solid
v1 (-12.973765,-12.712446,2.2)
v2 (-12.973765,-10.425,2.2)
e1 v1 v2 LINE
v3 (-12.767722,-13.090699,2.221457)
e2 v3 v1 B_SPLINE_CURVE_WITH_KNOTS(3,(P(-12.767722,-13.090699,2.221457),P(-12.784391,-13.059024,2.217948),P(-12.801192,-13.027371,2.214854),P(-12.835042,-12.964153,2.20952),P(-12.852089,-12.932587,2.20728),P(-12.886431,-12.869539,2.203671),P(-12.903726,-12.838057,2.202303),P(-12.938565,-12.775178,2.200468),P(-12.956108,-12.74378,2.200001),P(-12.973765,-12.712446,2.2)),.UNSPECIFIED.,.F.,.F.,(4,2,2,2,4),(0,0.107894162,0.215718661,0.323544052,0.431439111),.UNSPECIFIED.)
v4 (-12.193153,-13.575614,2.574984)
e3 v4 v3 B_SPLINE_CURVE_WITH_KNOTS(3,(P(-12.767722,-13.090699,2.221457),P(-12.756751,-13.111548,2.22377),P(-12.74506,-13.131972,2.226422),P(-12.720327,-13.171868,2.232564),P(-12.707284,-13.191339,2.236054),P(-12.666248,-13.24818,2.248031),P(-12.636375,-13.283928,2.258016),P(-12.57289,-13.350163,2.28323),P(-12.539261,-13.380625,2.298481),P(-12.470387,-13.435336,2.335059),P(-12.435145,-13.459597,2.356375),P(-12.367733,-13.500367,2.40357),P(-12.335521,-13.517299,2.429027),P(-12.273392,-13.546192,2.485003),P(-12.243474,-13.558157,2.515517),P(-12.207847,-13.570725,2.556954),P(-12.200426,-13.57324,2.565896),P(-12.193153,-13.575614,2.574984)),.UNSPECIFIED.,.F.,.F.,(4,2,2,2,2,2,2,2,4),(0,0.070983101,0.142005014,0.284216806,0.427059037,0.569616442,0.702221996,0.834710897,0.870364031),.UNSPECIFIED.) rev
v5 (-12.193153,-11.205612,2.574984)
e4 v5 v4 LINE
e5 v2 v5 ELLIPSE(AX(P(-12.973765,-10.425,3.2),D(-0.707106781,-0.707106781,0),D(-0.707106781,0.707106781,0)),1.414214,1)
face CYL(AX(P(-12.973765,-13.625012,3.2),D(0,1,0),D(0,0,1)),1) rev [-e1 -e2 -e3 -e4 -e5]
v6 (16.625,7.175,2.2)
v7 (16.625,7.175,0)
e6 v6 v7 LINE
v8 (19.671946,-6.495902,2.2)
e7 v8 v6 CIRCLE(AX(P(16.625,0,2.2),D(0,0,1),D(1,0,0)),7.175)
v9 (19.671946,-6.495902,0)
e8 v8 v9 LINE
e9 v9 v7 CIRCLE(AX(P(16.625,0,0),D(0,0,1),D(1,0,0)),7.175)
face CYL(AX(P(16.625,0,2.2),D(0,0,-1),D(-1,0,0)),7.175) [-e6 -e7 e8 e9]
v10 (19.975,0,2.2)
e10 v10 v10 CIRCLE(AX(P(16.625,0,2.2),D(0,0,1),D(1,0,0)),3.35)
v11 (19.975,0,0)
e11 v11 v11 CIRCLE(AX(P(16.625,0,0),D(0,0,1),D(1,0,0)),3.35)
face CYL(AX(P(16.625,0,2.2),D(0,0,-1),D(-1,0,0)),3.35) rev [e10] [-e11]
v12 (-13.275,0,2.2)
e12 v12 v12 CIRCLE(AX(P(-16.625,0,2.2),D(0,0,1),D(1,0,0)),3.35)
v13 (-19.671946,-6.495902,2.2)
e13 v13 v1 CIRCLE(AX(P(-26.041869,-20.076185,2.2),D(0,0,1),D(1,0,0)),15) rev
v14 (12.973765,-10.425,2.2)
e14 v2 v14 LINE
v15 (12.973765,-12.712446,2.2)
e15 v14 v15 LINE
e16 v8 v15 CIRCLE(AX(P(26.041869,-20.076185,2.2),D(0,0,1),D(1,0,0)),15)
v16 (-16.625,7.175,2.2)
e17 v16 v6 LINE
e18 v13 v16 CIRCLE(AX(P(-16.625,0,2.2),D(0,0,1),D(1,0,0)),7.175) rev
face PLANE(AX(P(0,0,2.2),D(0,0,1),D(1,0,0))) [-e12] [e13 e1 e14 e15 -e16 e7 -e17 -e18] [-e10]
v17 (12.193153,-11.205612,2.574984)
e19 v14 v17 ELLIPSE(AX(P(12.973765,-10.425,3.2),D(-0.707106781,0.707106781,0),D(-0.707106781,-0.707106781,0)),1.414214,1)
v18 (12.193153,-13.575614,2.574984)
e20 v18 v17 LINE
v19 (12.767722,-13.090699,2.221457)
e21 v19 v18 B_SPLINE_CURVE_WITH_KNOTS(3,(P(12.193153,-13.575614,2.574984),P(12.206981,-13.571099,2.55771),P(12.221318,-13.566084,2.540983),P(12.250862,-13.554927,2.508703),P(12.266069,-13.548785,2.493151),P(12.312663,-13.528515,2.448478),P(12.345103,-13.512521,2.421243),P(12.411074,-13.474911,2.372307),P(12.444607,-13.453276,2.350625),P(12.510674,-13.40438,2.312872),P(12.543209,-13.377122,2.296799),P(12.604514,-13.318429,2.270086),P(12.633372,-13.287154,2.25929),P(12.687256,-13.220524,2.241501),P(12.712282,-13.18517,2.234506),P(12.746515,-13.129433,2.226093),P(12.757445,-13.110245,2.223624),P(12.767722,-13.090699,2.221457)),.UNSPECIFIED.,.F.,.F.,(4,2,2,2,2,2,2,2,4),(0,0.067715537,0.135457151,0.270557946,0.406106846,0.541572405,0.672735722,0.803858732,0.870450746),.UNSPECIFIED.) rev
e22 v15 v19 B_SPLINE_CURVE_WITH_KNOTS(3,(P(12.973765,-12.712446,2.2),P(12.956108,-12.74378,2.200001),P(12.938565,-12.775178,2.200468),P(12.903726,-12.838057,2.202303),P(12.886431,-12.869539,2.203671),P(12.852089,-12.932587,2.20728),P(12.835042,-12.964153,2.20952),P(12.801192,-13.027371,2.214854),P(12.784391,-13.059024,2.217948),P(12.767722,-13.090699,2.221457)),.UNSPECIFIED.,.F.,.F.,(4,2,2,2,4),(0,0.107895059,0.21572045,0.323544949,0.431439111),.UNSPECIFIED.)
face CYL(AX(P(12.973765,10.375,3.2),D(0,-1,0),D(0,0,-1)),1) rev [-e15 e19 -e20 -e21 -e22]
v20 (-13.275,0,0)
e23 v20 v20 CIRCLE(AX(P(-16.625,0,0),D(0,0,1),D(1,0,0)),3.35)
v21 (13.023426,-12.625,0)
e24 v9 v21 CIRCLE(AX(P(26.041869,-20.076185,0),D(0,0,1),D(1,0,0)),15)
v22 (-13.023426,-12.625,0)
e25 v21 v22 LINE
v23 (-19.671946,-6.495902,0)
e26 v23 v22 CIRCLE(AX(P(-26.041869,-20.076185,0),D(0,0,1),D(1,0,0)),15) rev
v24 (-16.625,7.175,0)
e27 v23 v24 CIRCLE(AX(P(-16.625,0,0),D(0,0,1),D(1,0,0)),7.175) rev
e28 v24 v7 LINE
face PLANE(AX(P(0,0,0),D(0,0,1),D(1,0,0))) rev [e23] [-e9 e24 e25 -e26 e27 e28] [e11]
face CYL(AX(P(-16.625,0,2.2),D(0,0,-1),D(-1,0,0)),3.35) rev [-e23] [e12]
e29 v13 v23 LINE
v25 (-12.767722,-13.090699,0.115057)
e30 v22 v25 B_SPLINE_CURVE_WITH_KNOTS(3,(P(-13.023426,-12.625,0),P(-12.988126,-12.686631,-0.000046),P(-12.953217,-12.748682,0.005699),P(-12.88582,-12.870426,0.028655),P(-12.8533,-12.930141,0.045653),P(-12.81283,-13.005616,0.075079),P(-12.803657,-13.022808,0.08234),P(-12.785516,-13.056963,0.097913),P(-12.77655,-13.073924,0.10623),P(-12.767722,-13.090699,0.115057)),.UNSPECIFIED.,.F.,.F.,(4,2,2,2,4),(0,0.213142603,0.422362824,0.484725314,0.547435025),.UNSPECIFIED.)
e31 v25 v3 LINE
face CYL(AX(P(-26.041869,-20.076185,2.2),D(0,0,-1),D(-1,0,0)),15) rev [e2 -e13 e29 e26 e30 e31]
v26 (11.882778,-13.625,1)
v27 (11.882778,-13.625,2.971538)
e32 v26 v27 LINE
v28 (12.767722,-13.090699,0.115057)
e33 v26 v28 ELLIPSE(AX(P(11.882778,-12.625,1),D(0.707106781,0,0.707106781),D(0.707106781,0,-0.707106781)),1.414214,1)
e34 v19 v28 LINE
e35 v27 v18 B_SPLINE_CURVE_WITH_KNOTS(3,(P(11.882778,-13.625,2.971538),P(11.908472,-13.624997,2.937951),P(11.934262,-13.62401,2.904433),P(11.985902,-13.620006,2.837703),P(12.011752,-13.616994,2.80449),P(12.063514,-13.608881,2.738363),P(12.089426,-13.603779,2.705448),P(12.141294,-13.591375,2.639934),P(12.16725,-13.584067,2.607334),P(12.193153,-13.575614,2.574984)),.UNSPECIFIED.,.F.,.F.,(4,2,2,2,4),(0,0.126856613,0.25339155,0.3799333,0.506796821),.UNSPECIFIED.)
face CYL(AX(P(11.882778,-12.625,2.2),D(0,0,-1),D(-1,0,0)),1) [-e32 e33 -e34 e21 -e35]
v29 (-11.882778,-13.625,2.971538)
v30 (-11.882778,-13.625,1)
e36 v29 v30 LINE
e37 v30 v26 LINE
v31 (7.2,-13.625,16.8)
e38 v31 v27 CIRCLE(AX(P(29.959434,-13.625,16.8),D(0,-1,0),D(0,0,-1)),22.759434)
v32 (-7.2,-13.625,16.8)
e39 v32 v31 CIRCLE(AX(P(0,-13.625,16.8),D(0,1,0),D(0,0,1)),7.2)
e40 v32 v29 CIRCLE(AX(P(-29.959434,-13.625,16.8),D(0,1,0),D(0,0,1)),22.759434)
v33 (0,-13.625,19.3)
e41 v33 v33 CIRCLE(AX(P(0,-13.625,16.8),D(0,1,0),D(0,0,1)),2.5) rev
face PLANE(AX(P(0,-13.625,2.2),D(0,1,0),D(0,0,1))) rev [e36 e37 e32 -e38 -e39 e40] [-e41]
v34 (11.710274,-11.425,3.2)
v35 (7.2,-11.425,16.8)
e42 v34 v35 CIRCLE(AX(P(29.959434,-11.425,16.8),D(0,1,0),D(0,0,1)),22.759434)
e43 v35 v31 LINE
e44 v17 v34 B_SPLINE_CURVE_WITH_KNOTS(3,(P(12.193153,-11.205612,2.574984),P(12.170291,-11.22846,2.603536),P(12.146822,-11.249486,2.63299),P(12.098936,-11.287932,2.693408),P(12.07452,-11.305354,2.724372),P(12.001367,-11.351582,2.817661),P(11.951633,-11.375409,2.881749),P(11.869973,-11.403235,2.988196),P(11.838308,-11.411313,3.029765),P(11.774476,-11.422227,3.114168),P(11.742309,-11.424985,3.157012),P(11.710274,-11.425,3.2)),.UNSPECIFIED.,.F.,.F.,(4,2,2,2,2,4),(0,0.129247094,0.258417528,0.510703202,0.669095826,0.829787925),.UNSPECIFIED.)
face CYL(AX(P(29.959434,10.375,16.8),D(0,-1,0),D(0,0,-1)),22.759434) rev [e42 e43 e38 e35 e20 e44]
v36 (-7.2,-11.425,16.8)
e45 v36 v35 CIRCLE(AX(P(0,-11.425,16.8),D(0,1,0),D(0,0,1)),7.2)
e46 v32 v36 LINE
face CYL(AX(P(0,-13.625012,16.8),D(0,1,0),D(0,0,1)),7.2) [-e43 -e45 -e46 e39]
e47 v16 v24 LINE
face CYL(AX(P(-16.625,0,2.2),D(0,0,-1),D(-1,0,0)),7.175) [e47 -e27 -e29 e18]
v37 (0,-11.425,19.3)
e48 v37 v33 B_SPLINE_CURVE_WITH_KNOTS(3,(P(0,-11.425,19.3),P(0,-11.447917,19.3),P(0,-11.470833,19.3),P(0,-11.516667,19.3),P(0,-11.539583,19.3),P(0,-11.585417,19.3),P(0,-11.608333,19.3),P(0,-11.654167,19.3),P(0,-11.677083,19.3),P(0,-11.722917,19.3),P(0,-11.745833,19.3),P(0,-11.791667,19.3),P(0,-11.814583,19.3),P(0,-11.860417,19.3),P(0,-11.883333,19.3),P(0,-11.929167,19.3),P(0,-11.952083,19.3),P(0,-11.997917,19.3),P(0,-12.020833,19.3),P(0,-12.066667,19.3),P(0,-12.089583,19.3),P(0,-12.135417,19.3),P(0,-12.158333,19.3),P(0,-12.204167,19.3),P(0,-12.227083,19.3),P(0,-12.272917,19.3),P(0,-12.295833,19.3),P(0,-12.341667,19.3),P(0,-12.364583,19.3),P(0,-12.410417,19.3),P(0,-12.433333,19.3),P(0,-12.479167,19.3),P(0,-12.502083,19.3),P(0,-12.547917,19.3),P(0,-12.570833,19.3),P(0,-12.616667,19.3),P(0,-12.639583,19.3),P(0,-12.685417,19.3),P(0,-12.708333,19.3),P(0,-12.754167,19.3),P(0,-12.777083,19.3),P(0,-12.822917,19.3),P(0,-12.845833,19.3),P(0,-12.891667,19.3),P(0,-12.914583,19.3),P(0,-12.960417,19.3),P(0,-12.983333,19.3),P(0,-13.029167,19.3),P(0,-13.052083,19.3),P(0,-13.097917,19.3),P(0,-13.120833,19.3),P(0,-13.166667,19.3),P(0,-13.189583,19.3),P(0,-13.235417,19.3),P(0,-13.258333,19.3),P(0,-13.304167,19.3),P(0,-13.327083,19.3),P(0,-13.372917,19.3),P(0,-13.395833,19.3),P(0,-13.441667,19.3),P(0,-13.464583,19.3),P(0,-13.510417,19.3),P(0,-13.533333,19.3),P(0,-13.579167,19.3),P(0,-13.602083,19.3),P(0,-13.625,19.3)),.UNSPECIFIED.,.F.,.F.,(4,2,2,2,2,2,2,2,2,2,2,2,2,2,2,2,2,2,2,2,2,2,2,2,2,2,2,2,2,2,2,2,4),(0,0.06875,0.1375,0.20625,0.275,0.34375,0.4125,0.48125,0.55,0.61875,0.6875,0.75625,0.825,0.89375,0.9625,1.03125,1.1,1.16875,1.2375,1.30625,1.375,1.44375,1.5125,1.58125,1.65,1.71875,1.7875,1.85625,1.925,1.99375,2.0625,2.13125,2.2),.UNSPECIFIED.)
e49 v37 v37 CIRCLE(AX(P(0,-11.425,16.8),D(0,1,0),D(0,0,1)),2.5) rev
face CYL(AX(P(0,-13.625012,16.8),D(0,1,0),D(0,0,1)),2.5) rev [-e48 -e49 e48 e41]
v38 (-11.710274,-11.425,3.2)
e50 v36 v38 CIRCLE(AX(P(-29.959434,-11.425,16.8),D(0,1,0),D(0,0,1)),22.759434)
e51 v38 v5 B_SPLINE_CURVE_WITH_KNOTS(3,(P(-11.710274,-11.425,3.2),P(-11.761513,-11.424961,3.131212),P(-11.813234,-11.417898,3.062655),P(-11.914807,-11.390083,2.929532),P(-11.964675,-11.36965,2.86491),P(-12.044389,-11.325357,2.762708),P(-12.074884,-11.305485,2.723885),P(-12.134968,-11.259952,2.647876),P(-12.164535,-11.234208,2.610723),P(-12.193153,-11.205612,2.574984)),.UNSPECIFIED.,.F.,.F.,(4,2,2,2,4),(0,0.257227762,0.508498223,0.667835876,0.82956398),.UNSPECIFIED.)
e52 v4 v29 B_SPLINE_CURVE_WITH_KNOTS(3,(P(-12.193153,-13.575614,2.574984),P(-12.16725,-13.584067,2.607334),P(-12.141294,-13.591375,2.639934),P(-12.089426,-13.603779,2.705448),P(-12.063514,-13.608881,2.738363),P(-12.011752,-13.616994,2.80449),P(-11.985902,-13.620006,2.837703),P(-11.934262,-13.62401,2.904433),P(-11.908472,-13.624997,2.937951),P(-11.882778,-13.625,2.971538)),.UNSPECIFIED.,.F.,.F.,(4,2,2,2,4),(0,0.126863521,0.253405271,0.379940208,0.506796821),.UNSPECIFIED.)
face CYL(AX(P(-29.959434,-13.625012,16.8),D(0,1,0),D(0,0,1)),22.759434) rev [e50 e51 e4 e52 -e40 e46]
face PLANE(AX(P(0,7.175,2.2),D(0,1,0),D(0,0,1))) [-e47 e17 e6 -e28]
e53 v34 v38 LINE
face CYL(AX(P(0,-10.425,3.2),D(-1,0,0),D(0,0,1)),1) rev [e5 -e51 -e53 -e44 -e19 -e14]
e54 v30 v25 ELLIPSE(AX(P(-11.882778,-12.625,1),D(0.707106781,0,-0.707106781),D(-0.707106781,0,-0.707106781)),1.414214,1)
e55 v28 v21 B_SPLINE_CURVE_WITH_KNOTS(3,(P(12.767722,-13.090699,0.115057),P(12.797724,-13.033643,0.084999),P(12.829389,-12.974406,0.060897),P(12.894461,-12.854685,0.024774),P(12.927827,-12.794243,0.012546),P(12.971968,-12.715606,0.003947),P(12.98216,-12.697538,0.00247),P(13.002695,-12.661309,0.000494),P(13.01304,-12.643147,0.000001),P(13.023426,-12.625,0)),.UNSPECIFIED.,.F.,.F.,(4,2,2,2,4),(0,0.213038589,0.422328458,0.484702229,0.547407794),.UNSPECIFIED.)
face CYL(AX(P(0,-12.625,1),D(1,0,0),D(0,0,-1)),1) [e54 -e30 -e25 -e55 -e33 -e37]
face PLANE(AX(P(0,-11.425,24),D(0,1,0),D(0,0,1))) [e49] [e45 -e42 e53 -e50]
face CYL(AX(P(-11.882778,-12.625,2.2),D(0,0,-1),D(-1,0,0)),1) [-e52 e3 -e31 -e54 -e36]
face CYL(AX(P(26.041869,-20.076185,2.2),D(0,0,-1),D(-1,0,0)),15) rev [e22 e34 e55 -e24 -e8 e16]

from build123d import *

# Parameters (mm, degrees)
ESBO_O1_R                  = 3.35
RESSALTO_EXTRUS_O1_DEPTH   = 2.2
ESBO_O2_W                  = 25
ESBO_O2_H                  = 2.2
RESSALTO_EXTRUS_O2_DEPTH   = 21.8
CORTE_EXTRUS_O2_DEPTH      = 40.687277558
CORTE_EXTRUS_O2_DEPTH_BACK = 24
ESBO_O3_R                  = 2.5
FILETE1_R                  = 1


with BuildPart() as part:
    # Esboço1 → Ressalto-extrusão1 (new body)
    with BuildSketch(Plane.XY):
        with BuildLine():
            ThreePointArc((19.671946284, -6.495902042), (15.467093732, -9.437851933), (12.5, -13.625))
            Line((12.5, -13.625), (-12.5, -13.625))
            ThreePointArc((-12.5, -13.625), (-15.467093732, -9.437851933), (-19.671946284, -6.495902042))
            ThreePointArc((-19.671946284, -6.495902042), (-23.628167932, 1.560853588), (-16.625, 7.175))
            Line((-16.625, 7.175), (16.625, 7.175))
            ThreePointArc((16.625, 7.175), (23.628167932, 1.560853588), (19.671946284, -6.495902042))
        make_face()
        with Locations((16.625, 0)):
            Circle(ESBO_O1_R, mode=Mode.SUBTRACT)
        with Locations((-16.625, 0)):
            Circle(ESBO_O1_R, mode=Mode.SUBTRACT)
    extrude(amount=RESSALTO_EXTRUS_O1_DEPTH)

    # Esboço2 → Ressalto-extrusão2 (add)
    with BuildSketch(Plane.XY.offset(2.2)):
        with Locations((0, -12.525)):
            Rectangle(ESBO_O2_W, ESBO_O2_H)
    extrude(amount=RESSALTO_EXTRUS_O2_DEPTH)

    # Esboço3 → Corte-extrusão2 (cut, two sides: drawn at the far end of the back side and taken through both)
    with BuildSketch(Plane.XZ.offset(13.625).offset(-CORTE_EXTRUS_O2_DEPTH_BACK)):
        with Locations(Location((0, 16.8, 0), (0, 0, 90))):
            Circle(ESBO_O3_R)
        with BuildLine():
            ThreePointArc((-12.5, 2.2), (-8.565992578, 9.033887716), (-7.2, 16.8))
            ThreePointArc((-7.2, 16.8), (-5.091168815, 21.891168834), (2.7e-08, 24))
            Line((2.7e-08, 24), (-12.5, 24))
            Line((-12.5, 24), (-12.5, 2.2))
        make_face()
        with BuildLine():
            Line((12.5, 24), (2.7e-08, 24))
            ThreePointArc((2.7e-08, 24), (5.091168834, 21.891168815), (7.2, 16.8))
            ThreePointArc((7.2, 16.8), (8.565992578, 9.033887716), (12.5, 2.2))
            Line((12.5, 2.2), (12.5, 24))
        make_face()
    extrude(amount=CORTE_EXTRUS_O2_DEPTH + CORTE_EXTRUS_O2_DEPTH_BACK, mode=Mode.SUBTRACT)

    # Filete1
    filete1_edges = [part.edges().sort_by_distance(p)[0] for p in [
        (12.5, -12.525, 2.2),
        (-12.5, -12.525, 2.2),
        (0, -11.425, 2.2),
    ]]
    fillet(filete1_edges, radius=FILETE1_R)
    filete1_2_edges = [part.edges().sort_by_distance(p)[0] for p in [
        (0, -13.625, 0),
        (12.5, -13.625, 1.159674218),
        (-12.5, -13.625, 1.159674218),
    ]]
    fillet(filete1_2_edges, radius=FILETE1_R)


solid = part.part
